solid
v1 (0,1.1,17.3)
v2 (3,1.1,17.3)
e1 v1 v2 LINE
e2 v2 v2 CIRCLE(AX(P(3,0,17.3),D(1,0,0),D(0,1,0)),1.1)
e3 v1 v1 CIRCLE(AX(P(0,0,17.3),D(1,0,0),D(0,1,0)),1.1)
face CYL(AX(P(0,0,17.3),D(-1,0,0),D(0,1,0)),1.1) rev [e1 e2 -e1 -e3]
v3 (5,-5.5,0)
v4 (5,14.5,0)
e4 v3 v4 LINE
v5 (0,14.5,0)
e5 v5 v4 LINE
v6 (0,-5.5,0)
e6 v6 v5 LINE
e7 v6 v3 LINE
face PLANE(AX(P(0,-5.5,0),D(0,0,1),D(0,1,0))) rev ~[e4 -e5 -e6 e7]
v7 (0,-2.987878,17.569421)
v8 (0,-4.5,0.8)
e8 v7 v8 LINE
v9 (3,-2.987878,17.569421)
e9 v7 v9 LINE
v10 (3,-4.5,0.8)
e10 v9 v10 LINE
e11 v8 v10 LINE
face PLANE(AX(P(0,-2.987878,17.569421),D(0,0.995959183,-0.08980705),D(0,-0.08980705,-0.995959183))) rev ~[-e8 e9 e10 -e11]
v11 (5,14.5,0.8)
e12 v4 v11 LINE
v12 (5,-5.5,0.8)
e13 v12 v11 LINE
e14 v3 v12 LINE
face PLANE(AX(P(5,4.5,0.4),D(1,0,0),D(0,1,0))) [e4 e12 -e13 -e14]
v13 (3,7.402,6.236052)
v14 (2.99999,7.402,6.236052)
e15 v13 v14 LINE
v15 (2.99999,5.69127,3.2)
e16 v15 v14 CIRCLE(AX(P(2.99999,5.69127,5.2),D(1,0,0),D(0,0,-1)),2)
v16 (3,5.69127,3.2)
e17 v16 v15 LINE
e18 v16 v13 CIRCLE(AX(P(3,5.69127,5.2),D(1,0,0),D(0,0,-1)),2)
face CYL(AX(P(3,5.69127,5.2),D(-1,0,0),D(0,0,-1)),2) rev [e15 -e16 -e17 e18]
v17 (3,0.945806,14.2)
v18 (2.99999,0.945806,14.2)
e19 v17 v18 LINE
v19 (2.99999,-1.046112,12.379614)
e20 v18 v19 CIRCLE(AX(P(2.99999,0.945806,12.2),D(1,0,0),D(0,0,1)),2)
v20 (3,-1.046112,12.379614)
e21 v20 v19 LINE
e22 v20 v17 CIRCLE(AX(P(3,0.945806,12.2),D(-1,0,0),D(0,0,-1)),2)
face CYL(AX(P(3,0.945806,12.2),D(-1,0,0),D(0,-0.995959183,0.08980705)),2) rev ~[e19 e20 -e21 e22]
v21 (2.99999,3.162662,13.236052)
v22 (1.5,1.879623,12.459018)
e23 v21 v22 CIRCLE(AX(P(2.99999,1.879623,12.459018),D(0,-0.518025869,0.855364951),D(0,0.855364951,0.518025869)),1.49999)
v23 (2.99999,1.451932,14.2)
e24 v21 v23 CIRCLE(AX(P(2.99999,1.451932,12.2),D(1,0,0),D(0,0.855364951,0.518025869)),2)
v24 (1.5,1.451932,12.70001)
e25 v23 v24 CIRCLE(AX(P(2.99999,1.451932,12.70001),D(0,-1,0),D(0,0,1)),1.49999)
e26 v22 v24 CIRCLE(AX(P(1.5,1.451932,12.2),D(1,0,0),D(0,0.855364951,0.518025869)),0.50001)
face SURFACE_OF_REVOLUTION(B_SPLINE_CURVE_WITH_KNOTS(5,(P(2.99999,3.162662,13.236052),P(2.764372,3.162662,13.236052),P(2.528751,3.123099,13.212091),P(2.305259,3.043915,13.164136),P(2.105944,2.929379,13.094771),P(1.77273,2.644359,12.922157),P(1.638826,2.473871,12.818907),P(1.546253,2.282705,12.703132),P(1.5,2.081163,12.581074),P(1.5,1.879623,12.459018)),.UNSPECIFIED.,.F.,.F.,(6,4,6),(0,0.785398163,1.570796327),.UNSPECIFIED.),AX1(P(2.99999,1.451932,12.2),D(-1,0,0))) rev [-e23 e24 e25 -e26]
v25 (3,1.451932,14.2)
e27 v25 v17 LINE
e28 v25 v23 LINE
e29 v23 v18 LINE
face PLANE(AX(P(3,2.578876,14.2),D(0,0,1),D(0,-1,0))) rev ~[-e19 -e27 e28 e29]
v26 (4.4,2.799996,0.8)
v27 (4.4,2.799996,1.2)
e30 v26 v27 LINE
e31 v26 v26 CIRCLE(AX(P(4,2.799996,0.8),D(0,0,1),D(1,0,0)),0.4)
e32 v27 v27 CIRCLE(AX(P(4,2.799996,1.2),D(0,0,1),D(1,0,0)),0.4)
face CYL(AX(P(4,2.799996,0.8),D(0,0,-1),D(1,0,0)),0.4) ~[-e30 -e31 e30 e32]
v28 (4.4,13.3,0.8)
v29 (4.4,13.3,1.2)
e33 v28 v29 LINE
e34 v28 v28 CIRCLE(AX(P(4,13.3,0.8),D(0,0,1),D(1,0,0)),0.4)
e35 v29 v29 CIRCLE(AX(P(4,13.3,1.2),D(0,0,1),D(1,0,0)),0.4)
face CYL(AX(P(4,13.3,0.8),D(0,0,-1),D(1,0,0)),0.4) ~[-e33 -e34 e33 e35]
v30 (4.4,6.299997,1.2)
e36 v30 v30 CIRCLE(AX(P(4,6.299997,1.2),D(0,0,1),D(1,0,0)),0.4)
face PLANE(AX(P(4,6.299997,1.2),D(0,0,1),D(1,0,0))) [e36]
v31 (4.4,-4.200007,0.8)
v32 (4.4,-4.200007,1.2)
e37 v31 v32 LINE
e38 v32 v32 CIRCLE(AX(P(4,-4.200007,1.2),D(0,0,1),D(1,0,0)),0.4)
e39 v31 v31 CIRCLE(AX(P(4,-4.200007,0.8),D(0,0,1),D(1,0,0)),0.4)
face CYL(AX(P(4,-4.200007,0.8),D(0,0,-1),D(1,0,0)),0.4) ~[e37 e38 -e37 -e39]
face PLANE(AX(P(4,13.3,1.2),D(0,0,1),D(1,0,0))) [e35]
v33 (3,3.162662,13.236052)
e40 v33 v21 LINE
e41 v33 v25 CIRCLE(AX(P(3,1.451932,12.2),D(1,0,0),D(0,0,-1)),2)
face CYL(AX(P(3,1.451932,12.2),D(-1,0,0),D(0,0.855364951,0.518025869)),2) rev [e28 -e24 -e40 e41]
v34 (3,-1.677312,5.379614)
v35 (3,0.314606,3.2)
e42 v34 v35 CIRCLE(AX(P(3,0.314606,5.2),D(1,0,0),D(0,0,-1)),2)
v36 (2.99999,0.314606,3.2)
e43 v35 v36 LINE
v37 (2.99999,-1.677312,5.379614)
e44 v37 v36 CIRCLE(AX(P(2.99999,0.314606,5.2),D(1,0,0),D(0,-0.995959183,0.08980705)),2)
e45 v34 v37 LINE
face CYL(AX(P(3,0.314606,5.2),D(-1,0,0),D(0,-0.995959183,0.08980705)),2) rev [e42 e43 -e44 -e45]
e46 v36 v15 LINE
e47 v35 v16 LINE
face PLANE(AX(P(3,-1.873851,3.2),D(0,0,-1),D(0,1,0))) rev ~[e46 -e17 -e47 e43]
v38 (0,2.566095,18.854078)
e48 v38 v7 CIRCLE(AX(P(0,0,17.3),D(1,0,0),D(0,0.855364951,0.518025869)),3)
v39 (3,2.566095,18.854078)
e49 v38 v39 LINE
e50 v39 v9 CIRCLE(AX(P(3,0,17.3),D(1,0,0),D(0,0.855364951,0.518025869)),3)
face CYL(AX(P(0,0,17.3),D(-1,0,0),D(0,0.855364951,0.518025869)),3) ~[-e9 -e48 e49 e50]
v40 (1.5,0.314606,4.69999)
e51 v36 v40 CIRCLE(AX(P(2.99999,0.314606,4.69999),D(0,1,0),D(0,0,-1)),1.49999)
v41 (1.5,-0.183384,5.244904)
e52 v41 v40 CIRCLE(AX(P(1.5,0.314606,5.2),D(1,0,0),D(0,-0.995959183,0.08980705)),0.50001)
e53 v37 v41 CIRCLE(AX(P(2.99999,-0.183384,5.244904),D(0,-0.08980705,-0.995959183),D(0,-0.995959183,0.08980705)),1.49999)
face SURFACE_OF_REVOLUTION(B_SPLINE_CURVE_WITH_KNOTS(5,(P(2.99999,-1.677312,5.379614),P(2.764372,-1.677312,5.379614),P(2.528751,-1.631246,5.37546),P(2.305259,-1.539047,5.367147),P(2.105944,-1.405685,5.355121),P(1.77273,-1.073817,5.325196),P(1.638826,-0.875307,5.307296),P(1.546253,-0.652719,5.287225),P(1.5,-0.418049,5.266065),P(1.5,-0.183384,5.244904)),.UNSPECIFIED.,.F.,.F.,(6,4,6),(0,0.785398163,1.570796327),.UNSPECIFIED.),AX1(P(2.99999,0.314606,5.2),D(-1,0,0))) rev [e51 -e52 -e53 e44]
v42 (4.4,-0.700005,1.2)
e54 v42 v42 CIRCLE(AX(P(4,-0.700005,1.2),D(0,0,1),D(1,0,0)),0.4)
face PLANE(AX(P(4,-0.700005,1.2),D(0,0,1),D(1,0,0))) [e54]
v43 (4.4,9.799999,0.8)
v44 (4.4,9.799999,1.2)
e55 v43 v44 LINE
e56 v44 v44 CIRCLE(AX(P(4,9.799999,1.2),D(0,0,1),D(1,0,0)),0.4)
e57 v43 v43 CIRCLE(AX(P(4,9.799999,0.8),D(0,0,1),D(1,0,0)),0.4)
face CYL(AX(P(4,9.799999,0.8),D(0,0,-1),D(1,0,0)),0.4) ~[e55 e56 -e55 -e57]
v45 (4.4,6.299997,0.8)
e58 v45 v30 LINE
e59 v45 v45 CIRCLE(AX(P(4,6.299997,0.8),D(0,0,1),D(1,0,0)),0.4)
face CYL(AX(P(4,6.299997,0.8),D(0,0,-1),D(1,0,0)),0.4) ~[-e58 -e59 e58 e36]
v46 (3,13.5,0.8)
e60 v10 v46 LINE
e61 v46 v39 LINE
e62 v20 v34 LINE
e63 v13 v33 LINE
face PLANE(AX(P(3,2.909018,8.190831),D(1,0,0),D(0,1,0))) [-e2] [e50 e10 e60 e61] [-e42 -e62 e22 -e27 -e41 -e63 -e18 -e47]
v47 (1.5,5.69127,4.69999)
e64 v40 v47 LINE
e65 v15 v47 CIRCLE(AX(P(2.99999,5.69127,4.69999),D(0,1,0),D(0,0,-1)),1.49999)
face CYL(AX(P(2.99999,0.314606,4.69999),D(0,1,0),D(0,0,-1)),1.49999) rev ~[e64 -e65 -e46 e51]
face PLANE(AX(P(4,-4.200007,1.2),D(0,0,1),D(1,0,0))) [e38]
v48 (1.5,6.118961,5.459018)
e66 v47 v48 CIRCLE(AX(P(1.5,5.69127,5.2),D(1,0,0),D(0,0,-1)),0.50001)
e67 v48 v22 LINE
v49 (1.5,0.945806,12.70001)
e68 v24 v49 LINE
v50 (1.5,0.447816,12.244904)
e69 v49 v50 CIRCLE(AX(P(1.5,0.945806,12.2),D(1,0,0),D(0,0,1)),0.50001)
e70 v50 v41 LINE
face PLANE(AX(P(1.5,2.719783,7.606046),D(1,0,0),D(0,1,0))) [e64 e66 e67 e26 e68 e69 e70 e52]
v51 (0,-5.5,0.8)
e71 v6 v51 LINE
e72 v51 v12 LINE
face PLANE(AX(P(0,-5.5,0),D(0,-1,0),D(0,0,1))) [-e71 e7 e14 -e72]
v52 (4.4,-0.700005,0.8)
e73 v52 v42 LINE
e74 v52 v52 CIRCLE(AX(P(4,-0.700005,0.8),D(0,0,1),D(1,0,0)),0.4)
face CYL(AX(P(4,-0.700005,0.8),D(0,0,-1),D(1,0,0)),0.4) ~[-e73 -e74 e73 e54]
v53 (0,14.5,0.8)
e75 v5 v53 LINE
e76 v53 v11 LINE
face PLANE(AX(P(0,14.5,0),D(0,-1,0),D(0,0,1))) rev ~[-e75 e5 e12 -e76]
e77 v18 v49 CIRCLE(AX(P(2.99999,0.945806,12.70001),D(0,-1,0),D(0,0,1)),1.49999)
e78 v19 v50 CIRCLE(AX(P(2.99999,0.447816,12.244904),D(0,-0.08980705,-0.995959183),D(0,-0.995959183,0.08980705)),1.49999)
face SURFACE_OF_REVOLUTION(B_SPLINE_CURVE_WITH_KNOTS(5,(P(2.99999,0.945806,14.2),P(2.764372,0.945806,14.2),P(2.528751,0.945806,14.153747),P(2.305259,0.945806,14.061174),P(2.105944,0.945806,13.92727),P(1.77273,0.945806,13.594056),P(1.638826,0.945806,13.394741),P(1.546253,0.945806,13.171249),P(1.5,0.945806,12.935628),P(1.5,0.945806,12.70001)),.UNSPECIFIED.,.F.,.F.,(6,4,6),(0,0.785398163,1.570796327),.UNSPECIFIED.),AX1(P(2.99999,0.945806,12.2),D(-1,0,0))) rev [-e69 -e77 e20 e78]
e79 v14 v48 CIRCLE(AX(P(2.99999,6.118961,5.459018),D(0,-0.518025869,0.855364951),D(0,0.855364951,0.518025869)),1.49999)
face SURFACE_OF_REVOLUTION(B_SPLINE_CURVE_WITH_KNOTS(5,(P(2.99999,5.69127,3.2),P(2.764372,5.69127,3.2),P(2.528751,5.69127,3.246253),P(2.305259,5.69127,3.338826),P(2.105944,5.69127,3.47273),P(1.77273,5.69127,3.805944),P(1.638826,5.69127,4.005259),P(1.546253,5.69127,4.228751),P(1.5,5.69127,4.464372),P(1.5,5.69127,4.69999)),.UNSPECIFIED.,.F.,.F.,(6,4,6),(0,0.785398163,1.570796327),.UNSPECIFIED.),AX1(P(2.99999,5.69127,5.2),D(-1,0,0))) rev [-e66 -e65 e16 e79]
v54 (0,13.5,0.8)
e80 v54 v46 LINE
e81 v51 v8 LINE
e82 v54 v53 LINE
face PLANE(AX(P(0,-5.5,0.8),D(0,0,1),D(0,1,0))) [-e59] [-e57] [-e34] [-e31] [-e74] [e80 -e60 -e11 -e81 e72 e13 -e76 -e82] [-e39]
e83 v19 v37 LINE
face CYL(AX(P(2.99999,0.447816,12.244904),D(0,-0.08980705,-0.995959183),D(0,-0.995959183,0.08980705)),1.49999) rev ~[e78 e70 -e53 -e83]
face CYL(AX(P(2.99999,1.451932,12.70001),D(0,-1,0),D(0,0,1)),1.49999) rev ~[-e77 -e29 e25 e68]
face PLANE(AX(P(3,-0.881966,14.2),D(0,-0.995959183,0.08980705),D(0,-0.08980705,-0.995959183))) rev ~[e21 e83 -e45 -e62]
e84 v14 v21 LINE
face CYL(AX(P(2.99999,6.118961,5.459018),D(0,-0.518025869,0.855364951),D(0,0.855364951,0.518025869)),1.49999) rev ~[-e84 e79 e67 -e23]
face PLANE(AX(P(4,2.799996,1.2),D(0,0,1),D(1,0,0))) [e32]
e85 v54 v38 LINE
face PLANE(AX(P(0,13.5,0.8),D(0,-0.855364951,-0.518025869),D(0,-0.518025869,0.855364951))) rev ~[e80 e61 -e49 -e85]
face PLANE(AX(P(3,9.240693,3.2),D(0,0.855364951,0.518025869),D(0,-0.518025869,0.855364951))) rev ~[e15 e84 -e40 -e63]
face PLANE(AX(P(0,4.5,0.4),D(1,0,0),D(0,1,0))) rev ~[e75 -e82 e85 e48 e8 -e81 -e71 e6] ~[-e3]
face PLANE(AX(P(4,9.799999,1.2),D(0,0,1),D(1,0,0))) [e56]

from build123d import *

# Parameters (mm, degrees)
F0_W     = 20
F0_H     = 0.8
F1_DEPTH = 5
F2_R     = 1.1
F3_DEPTH = 3
F5_DEPTH = 1.5
F6_R     = 2
F7_R     = 1.49999
F8_R     = 0.4
F9_DEPTH = 0.4


# Not quite as in the source:
# - a fillet or chamfer is up to 0.001 mm smaller than in the source, because OpenCascade refuses the exact size


with BuildPart() as f1:
    # F0 (on Right) → F1 (new body)
    with BuildSketch(Plane.YZ):
        with Locations((4.5, 0.4)):
            Rectangle(F0_W, F0_H)
    extrude(amount=F1_DEPTH)

    # F2 (on Right) → F3 (join)
    with BuildSketch(Plane.YZ):
        with BuildLine():
            Line((-4.5, 0.8), (13.5, 0.8))
            Line((13.5, 0.8), (2.5660948526, 18.8540776067))
            ThreePointArc((2.5660948526, 18.8540776067), (-0.6760626552, 20.2228306975), (-2.9878775484, 17.5694211496))
            Line((-2.9878775484, 17.5694211496), (-4.5, 0.8))
        make_face()
        with Locations((0, 17.3)):
            Circle(F2_R, mode=Mode.SUBTRACT)
    extrude(amount=F3_DEPTH)

    # F4 (on face) → F5 (cut)
    with BuildSketch(Plane.YZ.offset(3)):
        Polygon((-0.8819657168, 14.2), (-1.8738512935, 3.2), (9.2406928099, 3.2), (2.5788760591, 14.2), align=None)
    extrude(amount=-F5_DEPTH, mode=Mode.SUBTRACT)

    # F6
    f6_edges = [f1.edges().sort_by_distance(p)[0] for p in [
        (2.25, -0.881966, 14.2),
        (2.25, 2.578876, 14.2),
        (2.25, 9.240693, 3.2),
        (2.25, -1.873851, 3.2),
    ]]
    fillet(f6_edges, radius=F6_R)

    # F7 (radius 1.5 in the source; OpenCascade refuses exactly that, so slightly less here)
    f7_edges = [f1.edges().sort_by_distance(p)[0] for p in [
        (1.5, 5.282331, 9.736052),
        (1.5, 7.433697, 4.218191),
        (1.5, 2.433741, 13.942427),
        (1.5, 3.002938, 3.2),
        (1.5, 1.198869, 14.2),
        (1.5, -1.161746, 3.850783),
        (1.5, -0.403411, 13.676352),
        (1.5, -1.361712, 8.879614),
    ]]
    fillet(f7_edges, radius=F7_R)

    # F8 (on face) → F9 (join)
    with BuildSketch(Plane.XY.offset(0.8)):
        with Locations((4, 13.3)):
            Circle(F8_R)
        with Locations((4, 9.7999986556)):
            Circle(F8_R)
        with Locations((4, 6.2999973111)):
            Circle(F8_R)
        with Locations((4, 2.7999959667)):
            Circle(F8_R)
        with Locations((4, -0.7000053778)):
            Circle(F8_R)
        with Locations((4, -4.2000067222)):
            Circle(F8_R)
    extrude(amount=F9_DEPTH)


solid = f1.part
